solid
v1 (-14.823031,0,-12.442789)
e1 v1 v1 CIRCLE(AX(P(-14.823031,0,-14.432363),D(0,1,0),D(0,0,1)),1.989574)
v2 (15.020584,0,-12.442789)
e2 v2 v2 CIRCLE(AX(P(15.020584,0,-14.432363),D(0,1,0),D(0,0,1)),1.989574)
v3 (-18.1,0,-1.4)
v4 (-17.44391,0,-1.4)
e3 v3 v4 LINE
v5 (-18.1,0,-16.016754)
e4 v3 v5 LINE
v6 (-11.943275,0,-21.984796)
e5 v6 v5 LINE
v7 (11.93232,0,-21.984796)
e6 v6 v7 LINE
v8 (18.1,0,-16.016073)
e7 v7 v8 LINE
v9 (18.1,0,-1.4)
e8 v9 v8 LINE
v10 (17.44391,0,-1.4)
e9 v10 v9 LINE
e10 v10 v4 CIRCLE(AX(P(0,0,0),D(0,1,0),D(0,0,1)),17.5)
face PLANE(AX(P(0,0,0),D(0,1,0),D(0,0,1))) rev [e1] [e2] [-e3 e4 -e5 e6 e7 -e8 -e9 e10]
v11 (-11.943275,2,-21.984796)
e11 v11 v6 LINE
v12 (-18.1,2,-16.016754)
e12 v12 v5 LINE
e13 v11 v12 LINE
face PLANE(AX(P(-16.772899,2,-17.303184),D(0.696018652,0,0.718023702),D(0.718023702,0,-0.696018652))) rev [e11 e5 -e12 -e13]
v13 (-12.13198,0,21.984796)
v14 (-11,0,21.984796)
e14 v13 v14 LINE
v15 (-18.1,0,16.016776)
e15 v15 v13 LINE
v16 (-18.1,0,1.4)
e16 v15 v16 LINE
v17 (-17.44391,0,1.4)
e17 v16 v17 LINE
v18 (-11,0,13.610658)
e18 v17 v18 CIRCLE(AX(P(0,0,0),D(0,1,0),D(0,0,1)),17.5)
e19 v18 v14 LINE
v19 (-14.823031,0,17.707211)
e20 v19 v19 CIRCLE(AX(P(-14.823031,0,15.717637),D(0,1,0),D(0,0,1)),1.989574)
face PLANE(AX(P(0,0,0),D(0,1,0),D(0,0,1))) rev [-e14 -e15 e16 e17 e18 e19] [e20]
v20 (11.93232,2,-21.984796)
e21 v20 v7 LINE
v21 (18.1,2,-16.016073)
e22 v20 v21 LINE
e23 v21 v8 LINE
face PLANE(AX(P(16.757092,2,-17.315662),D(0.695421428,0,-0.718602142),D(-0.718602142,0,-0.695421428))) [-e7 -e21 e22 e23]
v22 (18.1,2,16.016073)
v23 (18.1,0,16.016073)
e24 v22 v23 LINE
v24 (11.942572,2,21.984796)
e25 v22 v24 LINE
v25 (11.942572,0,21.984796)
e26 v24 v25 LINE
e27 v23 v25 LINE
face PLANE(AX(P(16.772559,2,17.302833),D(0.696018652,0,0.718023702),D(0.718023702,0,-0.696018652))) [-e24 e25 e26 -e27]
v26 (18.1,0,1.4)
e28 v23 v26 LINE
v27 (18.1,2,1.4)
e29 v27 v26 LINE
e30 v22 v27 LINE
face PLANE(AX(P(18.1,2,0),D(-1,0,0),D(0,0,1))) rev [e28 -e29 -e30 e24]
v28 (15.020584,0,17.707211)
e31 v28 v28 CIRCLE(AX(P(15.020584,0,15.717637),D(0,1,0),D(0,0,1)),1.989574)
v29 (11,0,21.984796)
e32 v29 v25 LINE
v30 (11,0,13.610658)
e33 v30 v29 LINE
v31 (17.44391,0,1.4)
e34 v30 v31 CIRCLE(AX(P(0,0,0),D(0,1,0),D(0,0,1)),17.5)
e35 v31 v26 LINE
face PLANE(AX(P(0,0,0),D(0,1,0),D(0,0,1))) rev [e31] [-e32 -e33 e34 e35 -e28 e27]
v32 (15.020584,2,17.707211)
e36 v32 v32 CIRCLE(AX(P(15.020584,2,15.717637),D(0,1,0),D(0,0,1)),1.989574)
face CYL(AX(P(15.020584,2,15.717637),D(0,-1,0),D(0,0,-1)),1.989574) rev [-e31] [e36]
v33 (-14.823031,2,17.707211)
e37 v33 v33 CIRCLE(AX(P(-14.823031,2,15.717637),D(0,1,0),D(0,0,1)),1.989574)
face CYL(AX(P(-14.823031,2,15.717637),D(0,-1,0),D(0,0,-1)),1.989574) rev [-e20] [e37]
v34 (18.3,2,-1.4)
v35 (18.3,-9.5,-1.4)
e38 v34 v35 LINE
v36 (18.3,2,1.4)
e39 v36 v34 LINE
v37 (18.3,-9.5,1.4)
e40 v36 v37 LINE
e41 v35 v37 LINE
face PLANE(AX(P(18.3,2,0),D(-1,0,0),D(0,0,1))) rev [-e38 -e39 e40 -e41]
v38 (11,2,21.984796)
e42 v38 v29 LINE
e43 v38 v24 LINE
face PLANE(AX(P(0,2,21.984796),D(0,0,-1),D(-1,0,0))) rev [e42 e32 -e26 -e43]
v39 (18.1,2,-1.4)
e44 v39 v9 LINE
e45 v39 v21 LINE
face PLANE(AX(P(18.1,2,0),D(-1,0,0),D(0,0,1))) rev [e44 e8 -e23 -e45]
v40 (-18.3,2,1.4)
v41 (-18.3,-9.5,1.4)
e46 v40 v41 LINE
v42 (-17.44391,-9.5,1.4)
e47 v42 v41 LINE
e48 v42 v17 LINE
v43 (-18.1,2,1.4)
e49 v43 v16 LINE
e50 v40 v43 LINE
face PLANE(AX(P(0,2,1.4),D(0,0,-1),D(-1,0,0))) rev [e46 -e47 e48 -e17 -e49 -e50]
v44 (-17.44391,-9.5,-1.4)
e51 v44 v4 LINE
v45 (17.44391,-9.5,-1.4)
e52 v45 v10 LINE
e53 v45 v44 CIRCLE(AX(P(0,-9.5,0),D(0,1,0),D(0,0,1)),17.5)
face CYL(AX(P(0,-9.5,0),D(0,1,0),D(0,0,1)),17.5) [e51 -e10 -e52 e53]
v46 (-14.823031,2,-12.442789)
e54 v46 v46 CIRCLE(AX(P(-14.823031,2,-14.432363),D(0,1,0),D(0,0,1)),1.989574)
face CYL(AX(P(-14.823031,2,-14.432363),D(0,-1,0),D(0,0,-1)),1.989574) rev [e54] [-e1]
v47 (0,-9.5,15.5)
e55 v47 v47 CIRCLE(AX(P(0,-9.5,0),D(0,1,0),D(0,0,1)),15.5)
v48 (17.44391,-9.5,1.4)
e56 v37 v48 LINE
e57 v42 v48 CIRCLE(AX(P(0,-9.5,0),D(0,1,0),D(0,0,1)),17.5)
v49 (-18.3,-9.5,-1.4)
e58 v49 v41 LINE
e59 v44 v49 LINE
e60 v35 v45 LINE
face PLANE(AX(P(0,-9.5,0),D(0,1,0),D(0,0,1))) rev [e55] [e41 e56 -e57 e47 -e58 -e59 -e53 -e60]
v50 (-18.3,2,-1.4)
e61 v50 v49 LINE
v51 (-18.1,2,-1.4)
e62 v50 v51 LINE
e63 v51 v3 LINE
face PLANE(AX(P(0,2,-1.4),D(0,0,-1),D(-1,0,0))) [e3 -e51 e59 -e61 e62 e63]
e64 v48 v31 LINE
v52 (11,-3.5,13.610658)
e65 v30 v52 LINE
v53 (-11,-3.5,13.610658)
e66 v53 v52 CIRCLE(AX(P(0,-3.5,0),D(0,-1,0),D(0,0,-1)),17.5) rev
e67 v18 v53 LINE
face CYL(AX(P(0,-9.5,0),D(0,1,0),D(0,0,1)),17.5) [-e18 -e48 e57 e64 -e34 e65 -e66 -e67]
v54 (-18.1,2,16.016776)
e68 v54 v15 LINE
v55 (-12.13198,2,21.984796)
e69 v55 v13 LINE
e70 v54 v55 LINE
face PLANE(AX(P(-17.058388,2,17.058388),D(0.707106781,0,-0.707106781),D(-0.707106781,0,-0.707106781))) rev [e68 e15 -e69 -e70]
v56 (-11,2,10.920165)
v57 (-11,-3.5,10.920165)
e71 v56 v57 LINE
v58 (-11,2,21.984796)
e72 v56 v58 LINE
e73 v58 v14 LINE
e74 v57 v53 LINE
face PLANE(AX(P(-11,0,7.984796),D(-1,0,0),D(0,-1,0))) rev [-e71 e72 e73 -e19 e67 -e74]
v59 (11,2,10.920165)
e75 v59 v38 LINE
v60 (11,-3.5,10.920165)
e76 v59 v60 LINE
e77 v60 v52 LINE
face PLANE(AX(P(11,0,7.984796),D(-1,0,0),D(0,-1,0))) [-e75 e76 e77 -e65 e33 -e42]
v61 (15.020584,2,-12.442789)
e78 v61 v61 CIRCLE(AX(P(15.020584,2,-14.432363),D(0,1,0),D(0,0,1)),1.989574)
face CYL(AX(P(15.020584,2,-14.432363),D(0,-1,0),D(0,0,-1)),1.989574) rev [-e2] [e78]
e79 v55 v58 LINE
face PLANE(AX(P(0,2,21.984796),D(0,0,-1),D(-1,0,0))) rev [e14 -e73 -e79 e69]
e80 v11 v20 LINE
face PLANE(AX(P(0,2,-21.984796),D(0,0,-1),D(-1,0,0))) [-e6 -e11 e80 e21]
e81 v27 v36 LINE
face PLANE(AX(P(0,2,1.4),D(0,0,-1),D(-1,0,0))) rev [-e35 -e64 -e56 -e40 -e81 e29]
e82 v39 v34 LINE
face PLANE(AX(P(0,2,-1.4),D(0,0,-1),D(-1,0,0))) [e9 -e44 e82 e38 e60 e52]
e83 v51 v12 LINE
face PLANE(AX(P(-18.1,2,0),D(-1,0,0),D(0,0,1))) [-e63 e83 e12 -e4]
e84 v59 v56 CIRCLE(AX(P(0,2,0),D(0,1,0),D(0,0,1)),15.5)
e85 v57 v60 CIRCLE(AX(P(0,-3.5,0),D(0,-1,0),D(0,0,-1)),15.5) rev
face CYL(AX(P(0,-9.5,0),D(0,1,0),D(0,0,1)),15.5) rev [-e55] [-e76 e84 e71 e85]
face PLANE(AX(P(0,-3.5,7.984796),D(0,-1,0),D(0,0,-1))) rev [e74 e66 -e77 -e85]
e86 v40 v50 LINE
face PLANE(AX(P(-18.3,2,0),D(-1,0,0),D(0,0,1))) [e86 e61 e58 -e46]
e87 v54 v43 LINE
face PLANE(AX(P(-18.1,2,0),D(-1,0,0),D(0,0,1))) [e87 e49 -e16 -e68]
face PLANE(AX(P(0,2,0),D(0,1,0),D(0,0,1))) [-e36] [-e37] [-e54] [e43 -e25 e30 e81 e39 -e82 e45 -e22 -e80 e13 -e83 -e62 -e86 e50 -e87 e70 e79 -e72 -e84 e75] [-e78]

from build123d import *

# Parameters (mm, degrees)
SKETCH1_R              = 17.5
SKETCH1_R_2            = 1.989574321
BOSS_EXTRUDE1_DEPTH    = 2
EXTRUDE_THIN1_START    = -9.5
SKETCH1_3_R            = 17.5
SKETCH1_3_R_2          = 15.5
EXTRUDE_THIN1_DEPTH    = 11.5
BOSS_EXTRUDE2_START    = -9.5
SKETCH1_4_W            = 0.2
SKETCH1_4_H            = 2.8
BOSS_EXTRUDE2_DEPTH    = 9.5
CUT_EXTRUDE1_START     = -11.064631417
CUT_EXTRUDE1_OUTLINE_W = 22
CUT_EXTRUDE1_OUTLINE_H = 5.5
CUT_EXTRUDE1_DEPTH     = 11.064631417


# Read off the part's stored shape, not the designer's step: Cut-Extrude1
with BuildPart() as part:
    # Sketch1 → Boss-Extrude1 (new body)
    with BuildSketch(Plane(origin=(0, 0, 0), x_dir=(1, 0, 0), z_dir=(0, 1, 0))):
        Polygon((-18.1, -16.016775893), (-12.131979642, -21.984796251), (11.942572252, -21.984796251), (18.1, -16.016073287), (18.1, -1.4), (18.3, -1.4), (18.3, 1.4), (18.1, 1.4), (18.1, 16.016073287), (11.932319604, 21.984796251), (-11.943274858, 21.984796251), (-18.1, 16.01675436), (-18.1, 1.4), (-18.3, 1.4), (-18.3, -1.4), (-18.1, -1.4), align=None)
        with Locations(Location((0, 0, 0), (0, 0, 270))):
            Circle(SKETCH1_R, mode=Mode.SUBTRACT)
        with Locations(Location((-14.8230313, -15.717637138, 0), (0, 0, 270))):
            Circle(SKETCH1_R_2, mode=Mode.SUBTRACT)
        with Locations(Location((15.02058352, -15.717637138, 0), (0, 0, 270))):
            Circle(SKETCH1_R_2, mode=Mode.SUBTRACT)
        with Locations(Location((-14.8230313, 14.432362862, 0), (0, 0, 270))):
            Circle(SKETCH1_R_2, mode=Mode.SUBTRACT)
        with Locations(Location((15.02058352, 14.432362862, 0), (0, 0, 270))):
            Circle(SKETCH1_R_2, mode=Mode.SUBTRACT)
    extrude(amount=BOSS_EXTRUDE1_DEPTH)

    # Sketch1<3> → Extrude-Thin1 (add)
    with BuildSketch(Plane(origin=(0, 0, 0), x_dir=(1, 0, 0), z_dir=(0, 1, 0)).offset(EXTRUDE_THIN1_START)):
        Circle(SKETCH1_3_R)
        Circle(SKETCH1_3_R_2, mode=Mode.SUBTRACT)
    extrude(amount=EXTRUDE_THIN1_DEPTH)

    # Sketch1<4> → Boss-Extrude2 (add)
    with BuildSketch(Plane(origin=(0, 0, 0), x_dir=(1, 0, 0), z_dir=(0, 1, 0)).offset(BOSS_EXTRUDE2_START)):
        with Locations((-18.2, 0)):
            Rectangle(SKETCH1_4_W, SKETCH1_4_H)
        with Locations((18.2, 0)):
            Rectangle(SKETCH1_4_W, SKETCH1_4_H)
        with BuildLine():
            ThreePointArc((17.5, 0), (17.485971906, -0.700561574), (17.443910112, -1.4))
            Line((17.443910112, -1.4), (18.1, -1.4))
            Line((18.1, -1.4), (18.1, 1.4))
            Line((18.1, 1.4), (17.443910112, 1.4))
            ThreePointArc((17.443910112, 1.4), (17.485971906, 0.700561574), (17.5, 0))
        make_face()
        with BuildLine():
            Line((-18.1, 1.4), (-18.1, -1.4))
            Line((-18.1, -1.4), (-17.443910112, -1.4))
            ThreePointArc((-17.443910112, -1.4), (-17.5, 0), (-17.443910112, 1.4))
            Line((-17.443910112, 1.4), (-18.1, 1.4))
        make_face()
    extrude(amount=BOSS_EXTRUDE2_DEPTH)

    # Cut-Extrude1 outline → Cut-Extrude1 (cut)
    with BuildSketch(Plane.XY.offset(21.984796251).offset(CUT_EXTRUDE1_START)):
        with Locations((0, -0.75)):
            Rectangle(CUT_EXTRUDE1_OUTLINE_W, CUT_EXTRUDE1_OUTLINE_H)
    extrude(amount=CUT_EXTRUDE1_DEPTH, mode=Mode.SUBTRACT)


solid = part.part
